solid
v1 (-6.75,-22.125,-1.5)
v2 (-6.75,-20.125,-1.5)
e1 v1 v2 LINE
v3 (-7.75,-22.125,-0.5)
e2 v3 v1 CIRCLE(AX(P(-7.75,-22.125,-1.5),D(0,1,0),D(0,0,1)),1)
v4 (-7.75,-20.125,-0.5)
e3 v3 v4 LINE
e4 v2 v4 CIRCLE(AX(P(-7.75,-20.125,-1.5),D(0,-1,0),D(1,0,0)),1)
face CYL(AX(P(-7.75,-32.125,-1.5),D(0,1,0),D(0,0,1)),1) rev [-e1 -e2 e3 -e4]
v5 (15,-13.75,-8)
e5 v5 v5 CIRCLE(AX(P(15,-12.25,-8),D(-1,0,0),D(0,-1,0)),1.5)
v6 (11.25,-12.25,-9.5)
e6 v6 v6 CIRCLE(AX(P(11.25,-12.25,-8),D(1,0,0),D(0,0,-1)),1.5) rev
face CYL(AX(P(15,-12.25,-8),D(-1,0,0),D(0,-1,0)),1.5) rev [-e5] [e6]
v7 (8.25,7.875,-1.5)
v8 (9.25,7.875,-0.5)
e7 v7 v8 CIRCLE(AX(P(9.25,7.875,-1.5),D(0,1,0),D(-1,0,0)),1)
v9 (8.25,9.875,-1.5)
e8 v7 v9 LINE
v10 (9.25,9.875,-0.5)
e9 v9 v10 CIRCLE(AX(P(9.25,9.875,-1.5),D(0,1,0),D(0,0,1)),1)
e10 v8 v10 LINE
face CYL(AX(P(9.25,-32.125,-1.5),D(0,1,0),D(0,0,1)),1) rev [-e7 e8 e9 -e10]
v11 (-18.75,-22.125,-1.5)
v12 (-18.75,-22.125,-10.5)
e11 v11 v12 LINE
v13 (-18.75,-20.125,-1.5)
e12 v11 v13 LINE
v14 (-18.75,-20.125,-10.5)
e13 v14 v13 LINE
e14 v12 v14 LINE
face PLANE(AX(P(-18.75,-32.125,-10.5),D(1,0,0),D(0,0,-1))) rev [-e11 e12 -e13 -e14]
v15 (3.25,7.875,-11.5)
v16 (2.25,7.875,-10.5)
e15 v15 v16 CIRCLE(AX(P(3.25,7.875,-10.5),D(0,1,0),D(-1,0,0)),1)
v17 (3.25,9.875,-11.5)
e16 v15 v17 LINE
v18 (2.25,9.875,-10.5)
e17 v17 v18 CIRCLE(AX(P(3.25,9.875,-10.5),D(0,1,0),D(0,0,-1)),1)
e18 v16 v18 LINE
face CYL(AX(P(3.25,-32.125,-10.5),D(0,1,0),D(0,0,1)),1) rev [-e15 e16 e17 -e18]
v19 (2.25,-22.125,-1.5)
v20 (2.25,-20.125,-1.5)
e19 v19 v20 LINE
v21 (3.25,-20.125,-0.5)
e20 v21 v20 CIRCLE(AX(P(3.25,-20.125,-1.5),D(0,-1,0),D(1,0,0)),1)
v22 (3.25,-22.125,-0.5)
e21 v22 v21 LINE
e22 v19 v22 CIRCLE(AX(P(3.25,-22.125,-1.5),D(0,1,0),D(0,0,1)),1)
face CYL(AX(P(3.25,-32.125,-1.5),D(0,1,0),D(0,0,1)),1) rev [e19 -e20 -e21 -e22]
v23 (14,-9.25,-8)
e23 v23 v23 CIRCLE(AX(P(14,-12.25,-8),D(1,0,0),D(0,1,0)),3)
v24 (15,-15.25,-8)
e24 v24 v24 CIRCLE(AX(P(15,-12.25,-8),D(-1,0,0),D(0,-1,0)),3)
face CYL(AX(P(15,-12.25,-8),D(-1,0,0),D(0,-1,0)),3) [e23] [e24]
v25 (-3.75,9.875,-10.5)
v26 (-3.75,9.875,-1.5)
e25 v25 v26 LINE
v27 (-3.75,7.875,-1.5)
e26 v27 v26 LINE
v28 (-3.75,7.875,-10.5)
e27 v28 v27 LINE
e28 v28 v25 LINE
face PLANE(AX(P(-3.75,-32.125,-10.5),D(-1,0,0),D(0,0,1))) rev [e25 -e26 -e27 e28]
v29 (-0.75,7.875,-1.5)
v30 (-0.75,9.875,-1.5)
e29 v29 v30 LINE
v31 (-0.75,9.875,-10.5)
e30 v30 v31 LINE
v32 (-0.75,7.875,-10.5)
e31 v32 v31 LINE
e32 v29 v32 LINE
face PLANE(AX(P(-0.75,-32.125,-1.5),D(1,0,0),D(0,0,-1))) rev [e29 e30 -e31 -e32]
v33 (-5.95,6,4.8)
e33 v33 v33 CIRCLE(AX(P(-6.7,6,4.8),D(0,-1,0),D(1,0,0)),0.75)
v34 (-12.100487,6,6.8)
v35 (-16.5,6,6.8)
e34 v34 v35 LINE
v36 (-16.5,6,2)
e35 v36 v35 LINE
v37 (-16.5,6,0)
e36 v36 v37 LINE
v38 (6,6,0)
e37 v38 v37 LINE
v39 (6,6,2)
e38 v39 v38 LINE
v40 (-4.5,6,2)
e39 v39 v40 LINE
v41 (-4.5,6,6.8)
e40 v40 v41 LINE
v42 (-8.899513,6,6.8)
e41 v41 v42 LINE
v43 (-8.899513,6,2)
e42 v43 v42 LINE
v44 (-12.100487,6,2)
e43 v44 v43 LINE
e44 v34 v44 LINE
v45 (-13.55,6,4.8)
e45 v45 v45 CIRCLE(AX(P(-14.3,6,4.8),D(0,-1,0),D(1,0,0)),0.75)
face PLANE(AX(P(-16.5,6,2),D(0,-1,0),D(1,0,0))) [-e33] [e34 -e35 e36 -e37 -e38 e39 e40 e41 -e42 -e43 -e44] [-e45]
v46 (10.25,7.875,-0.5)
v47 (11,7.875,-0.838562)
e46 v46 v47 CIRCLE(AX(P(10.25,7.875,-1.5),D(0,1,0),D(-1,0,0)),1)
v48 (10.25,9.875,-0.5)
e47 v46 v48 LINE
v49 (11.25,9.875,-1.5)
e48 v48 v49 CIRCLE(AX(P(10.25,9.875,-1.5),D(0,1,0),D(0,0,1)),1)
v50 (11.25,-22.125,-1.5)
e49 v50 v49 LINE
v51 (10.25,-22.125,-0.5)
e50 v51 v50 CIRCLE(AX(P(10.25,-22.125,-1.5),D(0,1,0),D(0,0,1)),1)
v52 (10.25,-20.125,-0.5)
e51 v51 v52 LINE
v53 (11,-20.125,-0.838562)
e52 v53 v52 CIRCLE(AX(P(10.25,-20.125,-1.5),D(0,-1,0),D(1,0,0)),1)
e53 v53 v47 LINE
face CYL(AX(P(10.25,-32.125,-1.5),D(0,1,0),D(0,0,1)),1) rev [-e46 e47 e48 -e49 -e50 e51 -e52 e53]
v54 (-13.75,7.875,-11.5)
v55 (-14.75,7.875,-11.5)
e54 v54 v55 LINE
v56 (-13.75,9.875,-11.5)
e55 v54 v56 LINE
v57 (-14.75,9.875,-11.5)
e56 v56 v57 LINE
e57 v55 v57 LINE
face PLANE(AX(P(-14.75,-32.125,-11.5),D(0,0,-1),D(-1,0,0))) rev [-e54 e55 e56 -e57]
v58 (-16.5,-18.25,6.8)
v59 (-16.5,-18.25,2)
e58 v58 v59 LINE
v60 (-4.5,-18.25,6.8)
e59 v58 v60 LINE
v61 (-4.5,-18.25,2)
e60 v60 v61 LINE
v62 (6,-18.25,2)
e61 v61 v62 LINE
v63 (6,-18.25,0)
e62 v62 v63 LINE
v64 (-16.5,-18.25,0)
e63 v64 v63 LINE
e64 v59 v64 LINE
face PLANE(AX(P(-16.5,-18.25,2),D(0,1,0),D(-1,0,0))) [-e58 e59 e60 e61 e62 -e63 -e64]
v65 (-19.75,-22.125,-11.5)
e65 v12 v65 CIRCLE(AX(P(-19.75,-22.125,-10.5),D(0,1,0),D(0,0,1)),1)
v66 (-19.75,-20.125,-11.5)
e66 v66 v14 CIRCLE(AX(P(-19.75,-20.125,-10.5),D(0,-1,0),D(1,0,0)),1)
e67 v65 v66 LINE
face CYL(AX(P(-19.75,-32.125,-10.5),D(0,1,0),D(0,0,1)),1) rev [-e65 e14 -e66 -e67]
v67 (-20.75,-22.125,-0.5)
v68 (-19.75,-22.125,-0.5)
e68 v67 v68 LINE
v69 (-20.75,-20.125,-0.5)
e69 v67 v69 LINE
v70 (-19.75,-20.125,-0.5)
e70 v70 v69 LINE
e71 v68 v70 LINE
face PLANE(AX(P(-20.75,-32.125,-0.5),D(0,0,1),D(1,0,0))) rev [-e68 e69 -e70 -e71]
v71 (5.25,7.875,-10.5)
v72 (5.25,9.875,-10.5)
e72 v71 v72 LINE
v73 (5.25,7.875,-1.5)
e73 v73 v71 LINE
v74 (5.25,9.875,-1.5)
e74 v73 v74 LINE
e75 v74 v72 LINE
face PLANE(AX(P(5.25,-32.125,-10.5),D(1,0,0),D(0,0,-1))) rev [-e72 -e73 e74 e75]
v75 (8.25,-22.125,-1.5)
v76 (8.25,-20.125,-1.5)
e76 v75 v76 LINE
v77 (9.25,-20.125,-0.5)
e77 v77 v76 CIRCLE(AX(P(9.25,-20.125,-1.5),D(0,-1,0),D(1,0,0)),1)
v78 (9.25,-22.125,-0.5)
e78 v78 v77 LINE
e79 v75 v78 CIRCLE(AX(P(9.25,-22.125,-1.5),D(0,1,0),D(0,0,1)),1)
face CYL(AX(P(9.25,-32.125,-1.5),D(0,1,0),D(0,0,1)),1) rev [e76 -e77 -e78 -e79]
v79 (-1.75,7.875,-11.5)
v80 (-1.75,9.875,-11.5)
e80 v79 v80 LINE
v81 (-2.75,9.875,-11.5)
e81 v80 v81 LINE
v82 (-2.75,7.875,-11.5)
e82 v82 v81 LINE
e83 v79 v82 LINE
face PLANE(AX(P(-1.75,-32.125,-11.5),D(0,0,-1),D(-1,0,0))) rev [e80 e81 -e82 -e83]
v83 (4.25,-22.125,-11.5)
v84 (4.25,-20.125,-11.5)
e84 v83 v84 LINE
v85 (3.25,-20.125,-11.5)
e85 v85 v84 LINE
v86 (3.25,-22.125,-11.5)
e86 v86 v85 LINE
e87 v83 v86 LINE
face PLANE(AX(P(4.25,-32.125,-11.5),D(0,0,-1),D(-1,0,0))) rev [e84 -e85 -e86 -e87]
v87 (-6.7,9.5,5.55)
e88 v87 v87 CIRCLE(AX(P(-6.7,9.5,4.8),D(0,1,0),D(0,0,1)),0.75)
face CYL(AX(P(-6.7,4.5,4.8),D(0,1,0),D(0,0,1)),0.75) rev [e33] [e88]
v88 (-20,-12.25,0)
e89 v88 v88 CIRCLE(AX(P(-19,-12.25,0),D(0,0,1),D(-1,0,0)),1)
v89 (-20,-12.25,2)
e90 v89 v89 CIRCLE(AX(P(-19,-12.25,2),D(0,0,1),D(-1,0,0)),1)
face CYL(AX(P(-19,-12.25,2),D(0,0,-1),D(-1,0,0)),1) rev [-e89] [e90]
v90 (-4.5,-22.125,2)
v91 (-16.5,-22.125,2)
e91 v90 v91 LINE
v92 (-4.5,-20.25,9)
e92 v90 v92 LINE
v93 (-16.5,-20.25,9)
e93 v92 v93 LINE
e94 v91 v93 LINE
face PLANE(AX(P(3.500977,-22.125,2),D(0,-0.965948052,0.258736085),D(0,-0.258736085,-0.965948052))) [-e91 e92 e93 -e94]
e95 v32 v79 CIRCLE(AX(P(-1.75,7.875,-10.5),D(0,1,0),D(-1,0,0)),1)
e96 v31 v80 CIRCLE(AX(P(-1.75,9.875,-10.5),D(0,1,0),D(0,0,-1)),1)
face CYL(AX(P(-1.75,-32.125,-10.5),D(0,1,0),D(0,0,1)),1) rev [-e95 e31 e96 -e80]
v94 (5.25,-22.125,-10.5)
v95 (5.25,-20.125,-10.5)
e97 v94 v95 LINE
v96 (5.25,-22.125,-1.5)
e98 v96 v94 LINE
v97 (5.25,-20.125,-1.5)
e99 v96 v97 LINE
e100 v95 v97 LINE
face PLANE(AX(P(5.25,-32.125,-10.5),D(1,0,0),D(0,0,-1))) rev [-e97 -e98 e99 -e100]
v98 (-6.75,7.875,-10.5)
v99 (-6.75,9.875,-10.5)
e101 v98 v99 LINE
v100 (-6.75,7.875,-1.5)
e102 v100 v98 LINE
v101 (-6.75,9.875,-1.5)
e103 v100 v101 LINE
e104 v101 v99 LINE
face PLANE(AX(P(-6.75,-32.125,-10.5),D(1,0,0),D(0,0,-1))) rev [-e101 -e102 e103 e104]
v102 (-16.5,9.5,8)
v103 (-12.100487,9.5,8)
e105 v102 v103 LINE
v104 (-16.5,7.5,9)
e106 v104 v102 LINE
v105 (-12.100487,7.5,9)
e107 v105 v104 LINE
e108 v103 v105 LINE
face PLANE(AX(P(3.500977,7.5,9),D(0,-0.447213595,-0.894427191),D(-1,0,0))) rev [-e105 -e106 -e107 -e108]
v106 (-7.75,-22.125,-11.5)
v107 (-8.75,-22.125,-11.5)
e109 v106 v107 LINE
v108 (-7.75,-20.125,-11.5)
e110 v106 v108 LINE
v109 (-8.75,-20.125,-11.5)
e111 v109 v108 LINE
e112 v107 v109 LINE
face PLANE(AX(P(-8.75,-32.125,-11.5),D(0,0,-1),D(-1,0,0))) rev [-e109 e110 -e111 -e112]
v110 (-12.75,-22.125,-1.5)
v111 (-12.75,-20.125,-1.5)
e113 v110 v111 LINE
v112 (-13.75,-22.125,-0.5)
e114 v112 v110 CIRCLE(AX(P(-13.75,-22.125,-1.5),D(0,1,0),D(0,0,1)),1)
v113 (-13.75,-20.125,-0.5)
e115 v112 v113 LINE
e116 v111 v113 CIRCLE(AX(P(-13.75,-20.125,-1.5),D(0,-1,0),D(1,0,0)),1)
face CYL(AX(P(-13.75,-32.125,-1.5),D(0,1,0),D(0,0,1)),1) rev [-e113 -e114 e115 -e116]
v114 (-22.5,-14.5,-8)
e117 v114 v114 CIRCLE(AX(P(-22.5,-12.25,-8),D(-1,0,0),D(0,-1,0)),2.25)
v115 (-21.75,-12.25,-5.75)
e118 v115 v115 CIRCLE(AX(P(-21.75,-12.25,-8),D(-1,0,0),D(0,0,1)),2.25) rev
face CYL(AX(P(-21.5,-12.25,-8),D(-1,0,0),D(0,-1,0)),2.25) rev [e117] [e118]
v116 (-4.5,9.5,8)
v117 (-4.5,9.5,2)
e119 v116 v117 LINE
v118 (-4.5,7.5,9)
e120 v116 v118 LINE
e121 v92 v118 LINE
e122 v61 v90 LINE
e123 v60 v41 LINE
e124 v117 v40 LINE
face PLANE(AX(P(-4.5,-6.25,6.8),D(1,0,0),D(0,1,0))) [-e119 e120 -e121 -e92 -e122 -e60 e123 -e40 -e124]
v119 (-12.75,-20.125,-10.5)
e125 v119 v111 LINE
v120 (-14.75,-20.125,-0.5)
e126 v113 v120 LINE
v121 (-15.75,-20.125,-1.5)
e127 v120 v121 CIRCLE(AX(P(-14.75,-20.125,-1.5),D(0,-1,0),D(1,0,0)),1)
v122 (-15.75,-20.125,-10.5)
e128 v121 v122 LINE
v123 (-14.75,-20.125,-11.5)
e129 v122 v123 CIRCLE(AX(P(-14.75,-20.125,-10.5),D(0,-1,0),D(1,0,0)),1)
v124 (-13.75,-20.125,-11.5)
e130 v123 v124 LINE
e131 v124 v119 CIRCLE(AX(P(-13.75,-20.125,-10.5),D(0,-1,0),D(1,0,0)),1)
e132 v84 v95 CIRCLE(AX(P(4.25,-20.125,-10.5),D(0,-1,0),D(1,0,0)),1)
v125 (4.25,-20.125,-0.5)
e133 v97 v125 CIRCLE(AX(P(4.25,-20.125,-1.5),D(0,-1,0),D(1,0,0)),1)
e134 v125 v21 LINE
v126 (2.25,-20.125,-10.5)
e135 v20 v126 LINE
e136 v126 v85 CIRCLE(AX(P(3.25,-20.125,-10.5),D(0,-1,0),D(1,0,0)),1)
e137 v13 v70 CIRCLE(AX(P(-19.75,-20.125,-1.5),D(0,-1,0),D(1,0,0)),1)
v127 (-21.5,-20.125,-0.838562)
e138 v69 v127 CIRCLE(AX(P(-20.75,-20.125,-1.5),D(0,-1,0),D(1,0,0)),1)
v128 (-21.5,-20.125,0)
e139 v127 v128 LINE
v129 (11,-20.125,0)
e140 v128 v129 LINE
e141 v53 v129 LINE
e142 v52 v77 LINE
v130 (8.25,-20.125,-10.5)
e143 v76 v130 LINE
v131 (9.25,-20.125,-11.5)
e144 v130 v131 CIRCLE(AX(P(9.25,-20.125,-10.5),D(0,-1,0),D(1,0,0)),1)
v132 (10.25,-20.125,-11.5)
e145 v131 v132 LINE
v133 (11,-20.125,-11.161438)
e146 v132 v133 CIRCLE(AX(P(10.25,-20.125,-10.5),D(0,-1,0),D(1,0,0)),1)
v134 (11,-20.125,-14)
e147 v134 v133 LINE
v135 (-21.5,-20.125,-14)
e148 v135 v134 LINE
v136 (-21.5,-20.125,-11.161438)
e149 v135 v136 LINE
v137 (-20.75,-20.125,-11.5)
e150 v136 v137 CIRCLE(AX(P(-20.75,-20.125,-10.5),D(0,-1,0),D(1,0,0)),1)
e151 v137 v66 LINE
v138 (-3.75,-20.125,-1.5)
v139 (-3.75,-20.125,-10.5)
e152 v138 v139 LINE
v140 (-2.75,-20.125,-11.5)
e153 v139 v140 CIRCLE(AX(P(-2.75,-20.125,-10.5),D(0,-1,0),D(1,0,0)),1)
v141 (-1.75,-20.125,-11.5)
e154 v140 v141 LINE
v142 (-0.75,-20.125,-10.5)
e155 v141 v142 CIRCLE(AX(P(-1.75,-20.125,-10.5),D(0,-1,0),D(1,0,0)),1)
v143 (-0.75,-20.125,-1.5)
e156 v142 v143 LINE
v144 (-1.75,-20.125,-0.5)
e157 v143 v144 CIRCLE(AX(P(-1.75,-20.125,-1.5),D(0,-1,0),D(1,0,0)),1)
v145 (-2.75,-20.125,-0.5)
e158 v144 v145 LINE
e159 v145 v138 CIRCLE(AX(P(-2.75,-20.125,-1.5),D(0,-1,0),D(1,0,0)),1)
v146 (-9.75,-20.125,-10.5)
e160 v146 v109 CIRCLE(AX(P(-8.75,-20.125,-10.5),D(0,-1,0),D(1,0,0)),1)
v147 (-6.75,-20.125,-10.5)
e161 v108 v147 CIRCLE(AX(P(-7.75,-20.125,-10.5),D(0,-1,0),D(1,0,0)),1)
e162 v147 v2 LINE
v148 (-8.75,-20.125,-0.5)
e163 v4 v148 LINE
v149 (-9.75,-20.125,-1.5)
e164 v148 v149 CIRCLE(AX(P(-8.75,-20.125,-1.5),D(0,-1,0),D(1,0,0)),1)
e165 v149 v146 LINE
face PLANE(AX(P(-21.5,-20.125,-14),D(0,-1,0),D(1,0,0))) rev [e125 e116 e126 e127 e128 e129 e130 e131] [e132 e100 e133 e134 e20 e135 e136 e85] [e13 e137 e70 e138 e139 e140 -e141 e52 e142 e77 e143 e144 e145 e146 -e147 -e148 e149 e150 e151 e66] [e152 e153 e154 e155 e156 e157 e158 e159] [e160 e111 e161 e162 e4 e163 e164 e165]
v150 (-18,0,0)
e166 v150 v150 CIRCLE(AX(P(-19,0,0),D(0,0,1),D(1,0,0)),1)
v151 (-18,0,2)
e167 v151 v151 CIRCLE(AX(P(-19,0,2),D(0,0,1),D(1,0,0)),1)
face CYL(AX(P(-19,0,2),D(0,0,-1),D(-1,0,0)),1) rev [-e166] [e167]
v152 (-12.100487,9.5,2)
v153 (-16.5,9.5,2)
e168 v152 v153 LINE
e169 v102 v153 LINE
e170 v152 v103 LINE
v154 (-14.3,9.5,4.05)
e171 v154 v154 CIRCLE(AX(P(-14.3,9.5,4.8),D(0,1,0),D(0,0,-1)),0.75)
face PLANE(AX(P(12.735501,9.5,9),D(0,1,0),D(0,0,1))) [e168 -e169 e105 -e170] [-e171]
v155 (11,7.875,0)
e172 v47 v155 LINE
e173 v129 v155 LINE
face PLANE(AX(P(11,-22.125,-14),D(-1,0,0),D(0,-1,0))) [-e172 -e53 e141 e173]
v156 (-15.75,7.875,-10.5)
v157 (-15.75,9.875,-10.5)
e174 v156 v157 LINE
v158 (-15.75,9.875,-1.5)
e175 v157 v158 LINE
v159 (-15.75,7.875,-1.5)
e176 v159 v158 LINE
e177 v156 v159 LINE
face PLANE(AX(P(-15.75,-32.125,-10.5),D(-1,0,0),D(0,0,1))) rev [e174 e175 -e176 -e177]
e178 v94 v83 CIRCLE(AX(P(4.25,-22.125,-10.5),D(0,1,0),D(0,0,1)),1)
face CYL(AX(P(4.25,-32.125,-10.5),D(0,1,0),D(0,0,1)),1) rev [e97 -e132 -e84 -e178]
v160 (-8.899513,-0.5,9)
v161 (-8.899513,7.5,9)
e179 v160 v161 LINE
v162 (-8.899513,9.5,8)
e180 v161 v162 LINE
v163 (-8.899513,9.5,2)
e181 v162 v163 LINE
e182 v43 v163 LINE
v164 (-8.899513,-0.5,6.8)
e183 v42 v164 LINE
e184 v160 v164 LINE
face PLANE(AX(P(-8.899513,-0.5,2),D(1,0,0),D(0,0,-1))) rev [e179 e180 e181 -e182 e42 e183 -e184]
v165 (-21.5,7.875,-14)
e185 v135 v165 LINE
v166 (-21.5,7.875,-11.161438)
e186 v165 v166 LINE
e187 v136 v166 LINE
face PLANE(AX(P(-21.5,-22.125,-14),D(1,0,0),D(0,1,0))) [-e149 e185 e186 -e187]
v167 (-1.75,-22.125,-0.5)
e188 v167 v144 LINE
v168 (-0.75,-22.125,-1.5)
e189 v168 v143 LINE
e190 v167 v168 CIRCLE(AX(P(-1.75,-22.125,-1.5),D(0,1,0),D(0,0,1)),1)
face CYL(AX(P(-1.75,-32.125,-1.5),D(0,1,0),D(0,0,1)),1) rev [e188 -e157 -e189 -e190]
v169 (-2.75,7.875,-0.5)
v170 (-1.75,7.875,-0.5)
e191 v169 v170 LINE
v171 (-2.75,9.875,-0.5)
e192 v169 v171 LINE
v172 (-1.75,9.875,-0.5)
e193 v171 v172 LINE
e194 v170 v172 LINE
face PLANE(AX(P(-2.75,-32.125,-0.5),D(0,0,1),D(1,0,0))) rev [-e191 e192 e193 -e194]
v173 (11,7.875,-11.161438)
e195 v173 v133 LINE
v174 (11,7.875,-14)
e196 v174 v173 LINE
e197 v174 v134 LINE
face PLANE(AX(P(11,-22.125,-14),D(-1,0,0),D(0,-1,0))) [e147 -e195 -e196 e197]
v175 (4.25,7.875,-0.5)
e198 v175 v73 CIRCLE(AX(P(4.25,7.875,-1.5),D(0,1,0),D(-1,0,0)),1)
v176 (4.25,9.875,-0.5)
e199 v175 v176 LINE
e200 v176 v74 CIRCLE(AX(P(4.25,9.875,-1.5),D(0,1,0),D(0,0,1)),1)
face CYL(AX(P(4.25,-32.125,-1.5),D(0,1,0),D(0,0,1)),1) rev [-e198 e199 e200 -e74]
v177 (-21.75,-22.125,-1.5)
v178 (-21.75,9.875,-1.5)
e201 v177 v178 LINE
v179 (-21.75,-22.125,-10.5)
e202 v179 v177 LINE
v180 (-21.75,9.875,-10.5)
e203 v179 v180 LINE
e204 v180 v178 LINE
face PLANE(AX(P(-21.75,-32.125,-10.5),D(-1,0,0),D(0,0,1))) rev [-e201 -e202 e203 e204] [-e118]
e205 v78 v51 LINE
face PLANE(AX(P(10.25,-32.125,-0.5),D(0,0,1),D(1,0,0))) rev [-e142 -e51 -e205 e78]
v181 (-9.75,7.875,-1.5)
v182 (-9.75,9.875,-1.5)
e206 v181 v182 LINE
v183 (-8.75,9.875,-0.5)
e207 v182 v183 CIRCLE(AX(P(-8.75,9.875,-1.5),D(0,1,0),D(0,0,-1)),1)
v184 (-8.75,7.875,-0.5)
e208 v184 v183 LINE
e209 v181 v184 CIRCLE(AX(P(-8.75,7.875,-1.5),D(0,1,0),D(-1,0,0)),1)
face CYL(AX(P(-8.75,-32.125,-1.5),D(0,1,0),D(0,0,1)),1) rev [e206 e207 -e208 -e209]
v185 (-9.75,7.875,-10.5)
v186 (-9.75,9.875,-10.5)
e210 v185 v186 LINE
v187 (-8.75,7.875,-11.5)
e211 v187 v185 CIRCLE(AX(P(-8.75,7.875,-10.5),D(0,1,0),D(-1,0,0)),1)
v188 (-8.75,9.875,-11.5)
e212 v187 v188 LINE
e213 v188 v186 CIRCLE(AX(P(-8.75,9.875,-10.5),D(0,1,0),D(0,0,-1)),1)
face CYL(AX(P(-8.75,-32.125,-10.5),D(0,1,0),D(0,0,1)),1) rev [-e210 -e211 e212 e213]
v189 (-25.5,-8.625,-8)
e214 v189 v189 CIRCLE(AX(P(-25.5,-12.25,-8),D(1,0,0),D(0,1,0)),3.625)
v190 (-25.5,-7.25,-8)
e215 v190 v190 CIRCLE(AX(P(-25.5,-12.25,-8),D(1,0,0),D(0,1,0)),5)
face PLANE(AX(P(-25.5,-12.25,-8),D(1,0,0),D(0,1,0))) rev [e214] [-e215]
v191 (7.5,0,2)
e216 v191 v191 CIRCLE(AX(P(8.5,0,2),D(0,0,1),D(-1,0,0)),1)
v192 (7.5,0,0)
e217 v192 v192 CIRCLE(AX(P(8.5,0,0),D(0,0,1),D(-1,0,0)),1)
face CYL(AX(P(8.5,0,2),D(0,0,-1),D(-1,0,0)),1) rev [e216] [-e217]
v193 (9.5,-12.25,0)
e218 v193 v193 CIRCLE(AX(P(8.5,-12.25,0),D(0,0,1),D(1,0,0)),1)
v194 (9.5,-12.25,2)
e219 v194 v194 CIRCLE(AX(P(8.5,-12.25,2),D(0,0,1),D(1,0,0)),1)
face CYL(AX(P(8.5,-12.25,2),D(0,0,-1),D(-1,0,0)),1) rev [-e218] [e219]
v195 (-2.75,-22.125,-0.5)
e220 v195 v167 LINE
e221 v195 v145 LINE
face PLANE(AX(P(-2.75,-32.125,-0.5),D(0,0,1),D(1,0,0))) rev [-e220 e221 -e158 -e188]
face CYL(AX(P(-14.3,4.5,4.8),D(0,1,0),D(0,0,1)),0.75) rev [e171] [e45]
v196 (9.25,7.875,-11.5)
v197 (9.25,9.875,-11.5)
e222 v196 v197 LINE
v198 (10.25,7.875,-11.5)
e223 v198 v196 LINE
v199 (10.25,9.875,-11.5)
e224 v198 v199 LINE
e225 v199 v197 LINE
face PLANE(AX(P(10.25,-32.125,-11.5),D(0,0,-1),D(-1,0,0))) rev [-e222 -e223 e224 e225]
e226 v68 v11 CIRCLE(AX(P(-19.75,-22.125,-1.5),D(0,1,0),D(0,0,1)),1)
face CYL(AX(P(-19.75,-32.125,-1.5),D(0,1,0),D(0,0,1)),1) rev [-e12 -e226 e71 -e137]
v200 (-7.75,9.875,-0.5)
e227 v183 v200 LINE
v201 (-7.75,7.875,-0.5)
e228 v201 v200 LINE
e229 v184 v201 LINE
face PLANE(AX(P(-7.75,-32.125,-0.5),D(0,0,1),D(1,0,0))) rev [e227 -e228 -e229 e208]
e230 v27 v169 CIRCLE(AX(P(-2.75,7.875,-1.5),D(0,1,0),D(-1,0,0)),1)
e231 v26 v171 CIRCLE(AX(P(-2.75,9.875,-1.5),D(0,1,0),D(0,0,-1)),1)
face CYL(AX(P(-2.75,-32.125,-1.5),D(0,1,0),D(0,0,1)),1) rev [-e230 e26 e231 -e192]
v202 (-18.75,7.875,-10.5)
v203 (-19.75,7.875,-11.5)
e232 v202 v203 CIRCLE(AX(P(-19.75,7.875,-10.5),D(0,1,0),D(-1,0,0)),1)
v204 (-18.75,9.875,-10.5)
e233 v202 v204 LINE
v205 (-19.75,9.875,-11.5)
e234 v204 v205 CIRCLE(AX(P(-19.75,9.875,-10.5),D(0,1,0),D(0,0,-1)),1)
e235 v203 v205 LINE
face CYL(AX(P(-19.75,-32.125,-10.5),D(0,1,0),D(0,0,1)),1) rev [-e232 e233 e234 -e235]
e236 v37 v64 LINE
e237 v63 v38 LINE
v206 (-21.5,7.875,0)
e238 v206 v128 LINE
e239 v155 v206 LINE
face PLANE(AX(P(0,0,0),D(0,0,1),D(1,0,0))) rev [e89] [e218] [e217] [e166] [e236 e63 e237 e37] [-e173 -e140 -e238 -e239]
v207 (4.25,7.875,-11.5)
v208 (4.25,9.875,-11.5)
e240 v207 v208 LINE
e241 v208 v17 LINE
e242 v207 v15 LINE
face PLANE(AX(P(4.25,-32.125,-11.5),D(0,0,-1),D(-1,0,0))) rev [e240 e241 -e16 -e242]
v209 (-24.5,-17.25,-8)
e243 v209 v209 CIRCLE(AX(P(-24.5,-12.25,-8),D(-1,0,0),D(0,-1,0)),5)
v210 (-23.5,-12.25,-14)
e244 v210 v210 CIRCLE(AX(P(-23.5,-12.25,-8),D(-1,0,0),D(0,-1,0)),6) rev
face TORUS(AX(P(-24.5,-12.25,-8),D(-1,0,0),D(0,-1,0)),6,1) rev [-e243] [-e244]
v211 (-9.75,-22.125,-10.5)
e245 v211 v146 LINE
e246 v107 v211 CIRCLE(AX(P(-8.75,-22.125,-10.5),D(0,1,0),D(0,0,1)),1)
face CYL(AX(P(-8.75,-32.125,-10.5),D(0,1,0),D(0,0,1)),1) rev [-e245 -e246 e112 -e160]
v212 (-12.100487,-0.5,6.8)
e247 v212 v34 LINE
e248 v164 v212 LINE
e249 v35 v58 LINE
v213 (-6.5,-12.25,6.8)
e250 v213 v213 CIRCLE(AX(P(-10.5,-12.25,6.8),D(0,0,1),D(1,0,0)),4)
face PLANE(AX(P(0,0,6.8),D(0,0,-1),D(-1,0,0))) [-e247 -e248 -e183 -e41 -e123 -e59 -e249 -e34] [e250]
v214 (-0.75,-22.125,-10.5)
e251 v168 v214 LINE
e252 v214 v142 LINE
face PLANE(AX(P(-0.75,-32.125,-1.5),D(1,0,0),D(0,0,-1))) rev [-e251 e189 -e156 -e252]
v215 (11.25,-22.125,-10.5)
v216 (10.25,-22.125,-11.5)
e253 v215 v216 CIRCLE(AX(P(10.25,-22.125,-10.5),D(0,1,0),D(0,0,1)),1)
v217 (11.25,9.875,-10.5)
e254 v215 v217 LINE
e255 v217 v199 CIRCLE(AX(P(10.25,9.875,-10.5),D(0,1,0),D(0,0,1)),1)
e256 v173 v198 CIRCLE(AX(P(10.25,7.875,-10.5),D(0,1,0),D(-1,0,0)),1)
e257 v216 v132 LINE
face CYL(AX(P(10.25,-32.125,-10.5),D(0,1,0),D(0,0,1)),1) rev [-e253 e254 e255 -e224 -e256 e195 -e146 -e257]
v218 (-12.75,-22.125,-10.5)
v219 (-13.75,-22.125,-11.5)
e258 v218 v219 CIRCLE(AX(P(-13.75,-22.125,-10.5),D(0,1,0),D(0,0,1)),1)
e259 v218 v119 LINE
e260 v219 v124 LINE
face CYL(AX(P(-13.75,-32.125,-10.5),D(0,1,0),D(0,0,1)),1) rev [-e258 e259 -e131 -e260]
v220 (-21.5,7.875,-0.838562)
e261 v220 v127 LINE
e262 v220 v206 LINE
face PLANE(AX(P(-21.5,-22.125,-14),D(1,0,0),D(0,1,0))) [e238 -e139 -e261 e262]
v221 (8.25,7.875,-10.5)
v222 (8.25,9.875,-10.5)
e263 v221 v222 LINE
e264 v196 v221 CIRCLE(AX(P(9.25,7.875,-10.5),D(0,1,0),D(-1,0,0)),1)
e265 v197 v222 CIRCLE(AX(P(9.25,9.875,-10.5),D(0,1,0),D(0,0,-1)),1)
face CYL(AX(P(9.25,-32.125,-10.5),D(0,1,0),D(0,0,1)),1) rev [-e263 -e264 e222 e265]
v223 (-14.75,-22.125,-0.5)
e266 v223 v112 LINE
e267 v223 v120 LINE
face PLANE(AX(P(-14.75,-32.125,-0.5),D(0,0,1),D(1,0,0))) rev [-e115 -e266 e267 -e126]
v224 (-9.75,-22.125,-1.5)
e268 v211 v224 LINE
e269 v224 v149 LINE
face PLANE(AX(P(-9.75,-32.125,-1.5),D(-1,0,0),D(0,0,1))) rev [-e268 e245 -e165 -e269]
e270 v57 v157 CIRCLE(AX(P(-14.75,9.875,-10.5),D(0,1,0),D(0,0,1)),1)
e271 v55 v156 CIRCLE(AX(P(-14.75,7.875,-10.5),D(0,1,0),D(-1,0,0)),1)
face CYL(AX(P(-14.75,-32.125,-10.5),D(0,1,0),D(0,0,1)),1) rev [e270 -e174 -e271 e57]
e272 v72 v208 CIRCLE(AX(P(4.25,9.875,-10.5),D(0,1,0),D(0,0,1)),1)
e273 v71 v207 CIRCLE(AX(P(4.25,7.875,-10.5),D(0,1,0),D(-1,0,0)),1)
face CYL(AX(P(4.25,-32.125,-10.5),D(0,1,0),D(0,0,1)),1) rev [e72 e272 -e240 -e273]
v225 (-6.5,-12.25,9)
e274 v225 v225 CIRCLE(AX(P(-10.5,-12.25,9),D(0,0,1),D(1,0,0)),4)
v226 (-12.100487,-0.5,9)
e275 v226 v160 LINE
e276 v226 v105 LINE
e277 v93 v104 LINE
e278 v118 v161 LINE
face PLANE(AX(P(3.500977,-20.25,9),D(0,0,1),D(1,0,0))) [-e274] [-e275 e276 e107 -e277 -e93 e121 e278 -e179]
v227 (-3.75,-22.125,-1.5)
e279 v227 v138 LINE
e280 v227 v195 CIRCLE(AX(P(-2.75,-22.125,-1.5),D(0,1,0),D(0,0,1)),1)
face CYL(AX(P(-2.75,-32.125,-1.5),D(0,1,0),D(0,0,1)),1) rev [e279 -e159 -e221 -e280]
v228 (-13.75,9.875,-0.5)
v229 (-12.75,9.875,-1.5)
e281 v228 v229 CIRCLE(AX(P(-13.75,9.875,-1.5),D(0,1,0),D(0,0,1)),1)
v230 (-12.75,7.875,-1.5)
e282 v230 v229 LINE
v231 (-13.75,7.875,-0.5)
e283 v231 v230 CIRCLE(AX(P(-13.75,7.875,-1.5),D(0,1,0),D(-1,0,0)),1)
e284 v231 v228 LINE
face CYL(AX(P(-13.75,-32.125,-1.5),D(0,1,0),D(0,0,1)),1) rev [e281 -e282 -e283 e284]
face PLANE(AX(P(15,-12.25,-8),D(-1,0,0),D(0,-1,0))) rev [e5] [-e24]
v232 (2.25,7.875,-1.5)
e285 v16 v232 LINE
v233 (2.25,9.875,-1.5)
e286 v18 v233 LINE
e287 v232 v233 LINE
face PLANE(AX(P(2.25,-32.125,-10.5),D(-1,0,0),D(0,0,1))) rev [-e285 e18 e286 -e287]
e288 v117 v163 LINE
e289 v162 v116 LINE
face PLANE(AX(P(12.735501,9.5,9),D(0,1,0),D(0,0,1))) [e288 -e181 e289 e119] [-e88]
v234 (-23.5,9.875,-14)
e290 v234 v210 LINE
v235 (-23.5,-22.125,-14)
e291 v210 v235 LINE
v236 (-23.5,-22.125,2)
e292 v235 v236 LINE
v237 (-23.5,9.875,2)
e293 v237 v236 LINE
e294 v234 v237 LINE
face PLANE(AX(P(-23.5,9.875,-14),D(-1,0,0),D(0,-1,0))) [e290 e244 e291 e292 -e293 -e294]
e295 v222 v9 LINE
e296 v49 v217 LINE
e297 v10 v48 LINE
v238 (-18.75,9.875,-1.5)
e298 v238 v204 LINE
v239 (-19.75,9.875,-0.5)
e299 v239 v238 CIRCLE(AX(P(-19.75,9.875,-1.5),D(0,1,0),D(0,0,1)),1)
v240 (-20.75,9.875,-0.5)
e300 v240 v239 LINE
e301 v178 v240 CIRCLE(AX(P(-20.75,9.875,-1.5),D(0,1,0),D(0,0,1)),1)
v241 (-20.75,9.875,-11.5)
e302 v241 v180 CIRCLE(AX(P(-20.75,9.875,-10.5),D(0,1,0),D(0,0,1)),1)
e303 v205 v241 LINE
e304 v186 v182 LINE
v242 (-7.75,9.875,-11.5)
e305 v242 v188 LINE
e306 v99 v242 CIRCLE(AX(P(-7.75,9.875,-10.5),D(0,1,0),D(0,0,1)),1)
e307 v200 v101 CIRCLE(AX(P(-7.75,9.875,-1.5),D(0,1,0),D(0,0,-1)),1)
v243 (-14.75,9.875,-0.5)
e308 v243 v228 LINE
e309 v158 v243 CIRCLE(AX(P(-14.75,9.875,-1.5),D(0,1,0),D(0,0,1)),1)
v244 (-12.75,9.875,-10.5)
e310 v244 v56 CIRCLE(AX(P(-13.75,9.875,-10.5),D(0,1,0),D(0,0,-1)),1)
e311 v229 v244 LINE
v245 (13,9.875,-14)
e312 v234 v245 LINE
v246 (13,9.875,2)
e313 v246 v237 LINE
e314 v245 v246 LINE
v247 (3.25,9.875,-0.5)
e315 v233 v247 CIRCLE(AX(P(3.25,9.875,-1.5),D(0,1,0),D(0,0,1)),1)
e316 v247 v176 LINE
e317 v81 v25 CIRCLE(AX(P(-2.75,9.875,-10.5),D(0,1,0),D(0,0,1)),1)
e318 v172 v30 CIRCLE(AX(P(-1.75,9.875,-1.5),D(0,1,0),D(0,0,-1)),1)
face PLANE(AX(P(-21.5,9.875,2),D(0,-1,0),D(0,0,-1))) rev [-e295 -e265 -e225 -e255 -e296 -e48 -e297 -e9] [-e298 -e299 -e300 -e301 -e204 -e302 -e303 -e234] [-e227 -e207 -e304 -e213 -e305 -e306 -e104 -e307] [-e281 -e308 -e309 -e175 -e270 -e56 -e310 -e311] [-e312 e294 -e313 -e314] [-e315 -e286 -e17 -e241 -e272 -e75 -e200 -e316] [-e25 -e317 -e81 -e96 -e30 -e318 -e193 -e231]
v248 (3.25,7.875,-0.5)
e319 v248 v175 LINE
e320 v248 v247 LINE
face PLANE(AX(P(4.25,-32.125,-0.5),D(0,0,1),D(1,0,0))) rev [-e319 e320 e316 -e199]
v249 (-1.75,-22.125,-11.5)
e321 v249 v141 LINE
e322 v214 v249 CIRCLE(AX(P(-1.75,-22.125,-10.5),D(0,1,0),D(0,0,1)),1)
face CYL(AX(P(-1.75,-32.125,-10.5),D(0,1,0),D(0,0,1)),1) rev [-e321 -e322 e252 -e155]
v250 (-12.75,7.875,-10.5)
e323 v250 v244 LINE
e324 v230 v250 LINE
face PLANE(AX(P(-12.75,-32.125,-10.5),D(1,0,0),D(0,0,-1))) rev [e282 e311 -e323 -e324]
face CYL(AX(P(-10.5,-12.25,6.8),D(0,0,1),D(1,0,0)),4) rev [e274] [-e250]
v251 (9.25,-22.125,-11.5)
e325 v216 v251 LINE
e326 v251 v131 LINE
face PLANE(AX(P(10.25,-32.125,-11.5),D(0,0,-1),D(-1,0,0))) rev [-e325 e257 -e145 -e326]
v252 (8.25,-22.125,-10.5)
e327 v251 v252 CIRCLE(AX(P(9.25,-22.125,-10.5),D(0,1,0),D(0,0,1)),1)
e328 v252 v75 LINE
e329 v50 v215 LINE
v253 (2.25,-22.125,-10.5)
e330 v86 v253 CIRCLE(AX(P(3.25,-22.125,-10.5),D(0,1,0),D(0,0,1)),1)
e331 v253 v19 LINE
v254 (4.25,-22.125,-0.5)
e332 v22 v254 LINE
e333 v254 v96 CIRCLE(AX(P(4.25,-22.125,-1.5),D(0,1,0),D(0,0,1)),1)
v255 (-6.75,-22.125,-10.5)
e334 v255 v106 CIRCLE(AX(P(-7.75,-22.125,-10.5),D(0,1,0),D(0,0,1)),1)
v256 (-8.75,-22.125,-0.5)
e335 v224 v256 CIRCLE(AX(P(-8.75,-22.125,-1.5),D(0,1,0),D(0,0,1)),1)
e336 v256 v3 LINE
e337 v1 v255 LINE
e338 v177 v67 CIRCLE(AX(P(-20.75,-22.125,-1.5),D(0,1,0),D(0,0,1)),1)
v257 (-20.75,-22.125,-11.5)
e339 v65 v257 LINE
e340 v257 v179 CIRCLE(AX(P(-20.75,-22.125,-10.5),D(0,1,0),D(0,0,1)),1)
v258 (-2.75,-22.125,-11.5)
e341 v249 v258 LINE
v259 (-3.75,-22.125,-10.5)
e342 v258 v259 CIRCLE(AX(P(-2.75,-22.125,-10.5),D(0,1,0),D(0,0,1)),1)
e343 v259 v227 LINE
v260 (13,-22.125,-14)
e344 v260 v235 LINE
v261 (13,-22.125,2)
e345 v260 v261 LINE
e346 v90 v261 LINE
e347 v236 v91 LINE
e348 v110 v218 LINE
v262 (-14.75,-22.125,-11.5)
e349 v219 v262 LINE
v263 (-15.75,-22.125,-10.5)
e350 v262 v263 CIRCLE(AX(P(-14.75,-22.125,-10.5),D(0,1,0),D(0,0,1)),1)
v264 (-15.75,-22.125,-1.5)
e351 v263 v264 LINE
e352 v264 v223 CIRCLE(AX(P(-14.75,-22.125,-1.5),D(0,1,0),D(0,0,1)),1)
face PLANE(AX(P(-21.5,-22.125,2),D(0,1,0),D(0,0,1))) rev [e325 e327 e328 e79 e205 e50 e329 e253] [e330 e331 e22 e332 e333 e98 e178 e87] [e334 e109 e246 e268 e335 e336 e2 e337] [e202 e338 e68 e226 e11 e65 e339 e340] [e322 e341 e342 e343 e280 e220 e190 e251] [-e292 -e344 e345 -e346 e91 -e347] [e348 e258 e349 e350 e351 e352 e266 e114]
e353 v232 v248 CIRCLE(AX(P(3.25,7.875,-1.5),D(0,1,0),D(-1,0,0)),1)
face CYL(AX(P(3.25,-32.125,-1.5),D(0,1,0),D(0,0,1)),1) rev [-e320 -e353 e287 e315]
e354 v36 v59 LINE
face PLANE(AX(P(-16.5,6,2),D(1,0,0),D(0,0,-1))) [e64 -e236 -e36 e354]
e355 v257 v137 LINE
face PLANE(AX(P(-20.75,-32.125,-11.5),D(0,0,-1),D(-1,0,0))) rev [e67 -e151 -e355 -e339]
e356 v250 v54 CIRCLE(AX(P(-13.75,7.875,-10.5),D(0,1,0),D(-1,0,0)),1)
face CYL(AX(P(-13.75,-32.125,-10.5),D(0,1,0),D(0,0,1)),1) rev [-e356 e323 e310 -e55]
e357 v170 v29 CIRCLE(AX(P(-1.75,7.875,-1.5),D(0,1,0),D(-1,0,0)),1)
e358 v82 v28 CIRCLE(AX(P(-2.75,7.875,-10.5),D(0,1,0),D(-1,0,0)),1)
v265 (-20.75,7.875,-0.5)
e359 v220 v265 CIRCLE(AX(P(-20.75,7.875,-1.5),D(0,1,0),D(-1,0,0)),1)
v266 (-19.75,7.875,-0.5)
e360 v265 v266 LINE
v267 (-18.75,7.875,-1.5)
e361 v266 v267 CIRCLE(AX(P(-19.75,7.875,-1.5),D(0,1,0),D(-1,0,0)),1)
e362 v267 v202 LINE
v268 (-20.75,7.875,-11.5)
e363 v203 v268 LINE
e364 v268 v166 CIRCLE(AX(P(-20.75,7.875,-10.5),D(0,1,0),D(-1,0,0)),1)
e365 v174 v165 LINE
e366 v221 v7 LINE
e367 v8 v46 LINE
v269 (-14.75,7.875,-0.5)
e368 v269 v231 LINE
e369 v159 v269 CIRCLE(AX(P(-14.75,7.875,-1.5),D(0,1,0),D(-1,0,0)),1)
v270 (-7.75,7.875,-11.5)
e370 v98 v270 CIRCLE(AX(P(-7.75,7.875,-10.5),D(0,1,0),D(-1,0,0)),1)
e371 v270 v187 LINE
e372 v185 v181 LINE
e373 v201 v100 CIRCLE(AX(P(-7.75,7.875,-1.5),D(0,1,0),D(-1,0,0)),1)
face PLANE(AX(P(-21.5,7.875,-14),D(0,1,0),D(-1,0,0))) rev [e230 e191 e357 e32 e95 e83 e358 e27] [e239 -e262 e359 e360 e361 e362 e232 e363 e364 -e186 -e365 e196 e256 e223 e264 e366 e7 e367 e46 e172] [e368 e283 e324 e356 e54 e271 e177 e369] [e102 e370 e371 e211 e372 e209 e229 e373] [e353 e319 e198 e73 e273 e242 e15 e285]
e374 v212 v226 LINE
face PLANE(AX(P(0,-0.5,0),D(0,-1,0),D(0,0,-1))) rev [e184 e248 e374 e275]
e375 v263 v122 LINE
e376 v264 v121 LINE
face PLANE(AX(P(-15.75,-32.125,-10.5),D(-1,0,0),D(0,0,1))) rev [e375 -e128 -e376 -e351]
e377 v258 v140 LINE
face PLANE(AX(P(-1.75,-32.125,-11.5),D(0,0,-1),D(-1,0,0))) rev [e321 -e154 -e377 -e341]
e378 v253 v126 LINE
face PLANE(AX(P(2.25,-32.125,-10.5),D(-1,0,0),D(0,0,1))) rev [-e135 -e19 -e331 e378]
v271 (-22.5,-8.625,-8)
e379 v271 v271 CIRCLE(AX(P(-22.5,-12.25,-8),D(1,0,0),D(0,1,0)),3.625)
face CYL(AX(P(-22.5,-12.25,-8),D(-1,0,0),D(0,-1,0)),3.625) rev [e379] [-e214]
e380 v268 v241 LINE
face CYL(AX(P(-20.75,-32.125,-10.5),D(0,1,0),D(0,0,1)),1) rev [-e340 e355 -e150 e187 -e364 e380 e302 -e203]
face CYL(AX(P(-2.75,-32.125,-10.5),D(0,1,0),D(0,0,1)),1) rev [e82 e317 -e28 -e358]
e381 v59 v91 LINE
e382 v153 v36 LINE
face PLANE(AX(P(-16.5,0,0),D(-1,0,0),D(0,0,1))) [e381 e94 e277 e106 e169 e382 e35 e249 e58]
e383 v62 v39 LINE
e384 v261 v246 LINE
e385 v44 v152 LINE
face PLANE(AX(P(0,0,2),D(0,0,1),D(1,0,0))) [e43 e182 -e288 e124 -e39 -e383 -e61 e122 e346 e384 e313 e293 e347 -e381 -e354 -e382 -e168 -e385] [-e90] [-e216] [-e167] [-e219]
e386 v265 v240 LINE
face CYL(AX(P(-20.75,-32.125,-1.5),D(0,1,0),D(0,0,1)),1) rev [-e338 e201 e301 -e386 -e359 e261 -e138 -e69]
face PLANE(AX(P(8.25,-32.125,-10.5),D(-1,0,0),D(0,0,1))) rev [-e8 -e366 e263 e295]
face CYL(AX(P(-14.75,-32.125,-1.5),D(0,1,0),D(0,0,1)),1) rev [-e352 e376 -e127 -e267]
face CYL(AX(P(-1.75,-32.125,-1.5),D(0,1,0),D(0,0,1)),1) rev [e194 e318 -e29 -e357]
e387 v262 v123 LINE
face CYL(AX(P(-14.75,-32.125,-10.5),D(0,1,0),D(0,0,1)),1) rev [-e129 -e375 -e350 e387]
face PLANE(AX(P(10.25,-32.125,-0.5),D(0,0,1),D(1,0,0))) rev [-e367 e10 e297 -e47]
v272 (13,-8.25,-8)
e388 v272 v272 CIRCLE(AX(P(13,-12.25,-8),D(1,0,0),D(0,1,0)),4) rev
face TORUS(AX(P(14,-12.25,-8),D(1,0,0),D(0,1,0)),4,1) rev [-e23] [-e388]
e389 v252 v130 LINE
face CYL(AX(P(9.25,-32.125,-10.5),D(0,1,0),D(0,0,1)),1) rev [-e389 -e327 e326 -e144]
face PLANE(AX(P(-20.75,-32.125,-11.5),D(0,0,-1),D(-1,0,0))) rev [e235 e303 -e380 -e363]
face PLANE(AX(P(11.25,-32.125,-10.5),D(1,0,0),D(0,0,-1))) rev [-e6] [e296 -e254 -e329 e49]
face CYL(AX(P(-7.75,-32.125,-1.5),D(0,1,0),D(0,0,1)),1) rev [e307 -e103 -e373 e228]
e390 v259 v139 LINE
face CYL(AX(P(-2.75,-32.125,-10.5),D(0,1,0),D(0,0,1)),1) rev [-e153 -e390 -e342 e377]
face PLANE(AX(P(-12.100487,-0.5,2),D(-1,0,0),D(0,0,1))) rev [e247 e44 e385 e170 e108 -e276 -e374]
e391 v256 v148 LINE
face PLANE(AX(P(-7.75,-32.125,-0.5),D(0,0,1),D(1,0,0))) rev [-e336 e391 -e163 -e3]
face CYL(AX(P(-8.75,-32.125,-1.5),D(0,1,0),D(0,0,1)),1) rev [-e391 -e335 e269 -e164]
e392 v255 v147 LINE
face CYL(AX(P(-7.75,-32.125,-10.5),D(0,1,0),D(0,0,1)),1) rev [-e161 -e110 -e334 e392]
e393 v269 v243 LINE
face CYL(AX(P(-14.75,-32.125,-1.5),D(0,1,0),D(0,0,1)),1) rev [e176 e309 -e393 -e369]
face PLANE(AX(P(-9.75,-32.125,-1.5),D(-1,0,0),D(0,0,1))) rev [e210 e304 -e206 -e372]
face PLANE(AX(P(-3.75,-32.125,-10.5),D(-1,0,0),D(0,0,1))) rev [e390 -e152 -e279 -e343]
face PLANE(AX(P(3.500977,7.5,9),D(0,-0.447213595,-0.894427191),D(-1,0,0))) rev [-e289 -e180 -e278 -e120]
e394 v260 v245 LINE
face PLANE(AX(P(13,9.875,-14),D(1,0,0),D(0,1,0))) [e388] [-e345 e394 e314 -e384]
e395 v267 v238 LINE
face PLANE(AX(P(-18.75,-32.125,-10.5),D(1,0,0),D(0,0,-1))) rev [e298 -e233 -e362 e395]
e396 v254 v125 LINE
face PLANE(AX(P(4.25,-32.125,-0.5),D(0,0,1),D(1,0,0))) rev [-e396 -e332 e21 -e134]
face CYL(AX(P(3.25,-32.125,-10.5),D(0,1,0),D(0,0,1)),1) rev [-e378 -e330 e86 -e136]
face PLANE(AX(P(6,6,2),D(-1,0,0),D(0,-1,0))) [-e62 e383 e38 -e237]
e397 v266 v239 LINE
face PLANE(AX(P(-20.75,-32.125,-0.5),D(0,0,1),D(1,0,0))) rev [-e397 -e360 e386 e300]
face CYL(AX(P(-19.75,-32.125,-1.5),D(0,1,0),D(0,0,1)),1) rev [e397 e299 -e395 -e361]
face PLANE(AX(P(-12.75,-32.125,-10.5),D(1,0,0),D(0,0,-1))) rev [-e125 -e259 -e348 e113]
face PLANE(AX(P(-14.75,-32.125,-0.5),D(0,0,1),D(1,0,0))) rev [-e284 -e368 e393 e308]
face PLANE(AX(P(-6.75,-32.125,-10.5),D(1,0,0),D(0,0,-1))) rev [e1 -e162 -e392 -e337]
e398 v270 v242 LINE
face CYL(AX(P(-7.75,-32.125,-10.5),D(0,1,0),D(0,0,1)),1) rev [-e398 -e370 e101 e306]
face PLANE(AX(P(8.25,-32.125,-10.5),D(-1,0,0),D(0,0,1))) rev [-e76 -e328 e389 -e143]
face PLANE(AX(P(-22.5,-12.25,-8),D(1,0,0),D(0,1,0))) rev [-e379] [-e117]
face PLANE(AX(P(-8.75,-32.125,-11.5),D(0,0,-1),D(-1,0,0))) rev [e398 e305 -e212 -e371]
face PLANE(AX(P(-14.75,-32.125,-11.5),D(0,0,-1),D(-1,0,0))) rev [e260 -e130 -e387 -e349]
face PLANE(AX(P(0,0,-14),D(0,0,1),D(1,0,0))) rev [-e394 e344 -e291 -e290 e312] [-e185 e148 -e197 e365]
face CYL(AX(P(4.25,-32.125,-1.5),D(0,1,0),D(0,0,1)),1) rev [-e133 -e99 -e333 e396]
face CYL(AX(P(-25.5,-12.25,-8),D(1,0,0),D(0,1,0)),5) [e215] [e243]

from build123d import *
from OCP.BRepFilletAPI import BRepFilletAPI_MakeChamfer

# Parameters (mm, degrees)
SKETCH_1_W          = 32.5
SKETCH_1_H          = 32
SKETCH_1_R          = 1
SKETCH_1_W_2        = 22.5
SKETCH_1_H_2        = 24.25
EXTRUDE_1_DEPTH     = 2
SKETCH_2_W          = 12
SKETCH_2_H          = 12
SKETCH_2_R          = 4
EXTRUDE_2_DEPTH     = 2.2
EXTRUDE_3_DEPTH     = 12
EXTRUDE_4_DEPTH     = 12
SKETCH_5_W          = 32.5
SKETCH_5_H          = 2
EXTRUDE_5_DEPTH     = 14
SKETCH_7_W          = 2
SKETCH_7_H          = 32
EXTRUDE_6_DEPTH     = 16
SKETCH_9_R          = 3.625
CUT_EXTRUDE_1_DEPTH = 1
SKETCH_10_R         = 2.25
CUT_EXTRUDE_2_DEPTH = 1
EXTRUDE_START       = -2
SKETCH_11_R         = 5
SKETCH_11_R_2       = 3.625
EXTRUDE_7_DEPTH     = 2
FILLET_1_R          = 1
SKETCH_12_R         = 3
SKETCH_12_R_2       = 1.5
EXTRUDE_8_DEPTH     = 2
FILLET_2_R          = 1
CUT_EXTRUDE_START   = 2
SKETCH_13_R         = 1.5
CUT_EXTRUDE_3_DEPTH = 2
SKETCH_19_W         = 3.200973594
SKETCH_19_H         = 7
CUT_EXTRUDE_7_DEPTH = 10
CUT_EXTRUDE_8_DEPTH = 42
SKETCH_22_R         = 0.75
CUT_EXTRUDE_9_DEPTH = 5
CHAMFER_1_SIZE      = 1
CHAMFER_1_SIZE2     = 2


with BuildPart() as part:
    # 草图1 → 凸台-拉伸1 (new body)
    with BuildSketch(Plane.XY):
        with Locations((-5.25, -6.125)):
            Rectangle(SKETCH_1_W, SKETCH_1_H)
        with Locations((-19, 0)):
            Circle(SKETCH_1_R, mode=Mode.SUBTRACT)
        with Locations(Location((8.5, 0, 0), (0, 0, 180))):
            Circle(SKETCH_1_R, mode=Mode.SUBTRACT)
        with Locations(Location((-19, -12.25, 0), (0, 0, 180))):
            Circle(SKETCH_1_R, mode=Mode.SUBTRACT)
        with Locations((8.5, -12.25)):
            Circle(SKETCH_1_R, mode=Mode.SUBTRACT)
        with Locations((-5.25, -6.125)):
            Rectangle(SKETCH_1_W_2, SKETCH_1_H_2, mode=Mode.SUBTRACT)
    extrude(amount=EXTRUDE_1_DEPTH)



with BuildPart() as body_2:
    # 草图2 → 凸台-拉伸2 (new body)
    with BuildSketch(Plane.XY.offset(9)):
        with Locations((-10.5, -12.25)):
            Rectangle(SKETCH_2_W, SKETCH_2_H)
        with Locations((-10.5, -12.25)):
            Circle(SKETCH_2_R, mode=Mode.SUBTRACT)
    extrude(amount=-EXTRUDE_2_DEPTH)


with BuildPart() as part_1:
    add(part.part)

    add(body_2.part)  # 凸台-拉伸3 merges body 2
    # 草图3 → 凸台-拉伸3 (add)
    with BuildSketch(Plane.ZY.offset(16.5)):
        Polygon((9, -18.25), (2, -18.25), (2, -22.125), (9, -20.25), align=None)
    extrude(amount=-EXTRUDE_3_DEPTH)

    # 草图4 → 凸台-拉伸4 (add)
    with BuildSketch(Plane.ZY.offset(16.5)):
        Polygon((6.8, -6.25), (9, -6.25), (9, 9.5), (2, 9.5), (2, 6), (6.8, 6), align=None)
    extrude(amount=-EXTRUDE_4_DEPTH)

    # 草图5 → 凸台-拉伸5 (add)
    with BuildSketch(Plane(origin=(0, 0, 0), x_dir=(-1, 0, 0), z_dir=(0, 0, -1))):
        with Locations((5.25, 8.875)):
            Rectangle(SKETCH_5_W, SKETCH_5_H)
        with Locations((5.25, -21.125)):
            Rectangle(SKETCH_5_W, SKETCH_5_H)
    extrude(amount=EXTRUDE_5_DEPTH)

    # 草图7 → 凸台-拉伸6 (add)
    with BuildSketch(Plane.XY.offset(2)):
        with Locations((-22.5, -6.125)):
            Rectangle(SKETCH_7_W, SKETCH_7_H)
        with Locations((12, -6.125)):
            Rectangle(SKETCH_7_W, SKETCH_7_H)
    extrude(amount=-EXTRUDE_6_DEPTH)

    # 草图9 → 切除-拉伸1 (cut)
    with BuildSketch(Plane(origin=(-23.5, 0, 0), x_dir=(0, 0, -1), z_dir=(1, 0, 0))):
        with Locations(Location((8, -12.25, 0), (0, 0, 90))):
            Circle(SKETCH_9_R)
    extrude(amount=CUT_EXTRUDE_1_DEPTH, mode=Mode.SUBTRACT)

    # 草图10 → 切除-拉伸2 (cut)
    with BuildSketch(Plane.ZY.offset(22.5)):
        with Locations(Location((-8, -12.25, 0), (0, 0, 270))):
            Circle(SKETCH_10_R)
    extrude(amount=-CUT_EXTRUDE_2_DEPTH, mode=Mode.SUBTRACT)

    # 草图11 → 凸台-拉伸7 (add)
    with BuildSketch(Plane(origin=(-23.5, 0, 0), x_dir=(0, 0, -1), z_dir=(1, 0, 0)).offset(EXTRUDE_START)):
        with Locations(Location((8, -12.25, 0), (0, 0, 90))):
            Circle(SKETCH_11_R)
        with Locations(Location((8, -12.25, 0), (0, 0, 90))):
            Circle(SKETCH_11_R_2, mode=Mode.SUBTRACT)
    extrude(amount=EXTRUDE_7_DEPTH)

    # 圆角1
    fillet_1_edges = [part_1.edges().sort_by_distance(p)[0] for p in [
        (-23.5, -17.25, -8),
    ]]
    fillet(fillet_1_edges, radius=FILLET_1_R - 0.0001)  # a hair under: the kernel refuses the full size

    # 草图12 → 凸台-拉伸8 (add)
    with BuildSketch(Plane.ZY.offset(-13)):
        with Locations(Location((-8, -12.25, 0), (0, 0, 270))):
            Circle(SKETCH_12_R)
        with Locations(Location((-8, -12.25, 0), (0, 0, 270))):
            Circle(SKETCH_12_R_2, mode=Mode.SUBTRACT)
    extrude(amount=-EXTRUDE_8_DEPTH)

    # 圆角2
    fillet_2_edges = [part_1.edges().sort_by_distance(p)[0] for p in [
        (13, -9.25, -8),
    ]]
    fillet(fillet_2_edges, radius=FILLET_2_R)

    # 草图13 → 切除-拉伸3 (cut)
    with BuildSketch(Plane.ZY.offset(-13).offset(CUT_EXTRUDE_START)):
        with Locations(Location((-8, -12.25, 0), (0, 0, 270))):
            Circle(SKETCH_13_R)
    extrude(amount=-CUT_EXTRUDE_3_DEPTH, mode=Mode.SUBTRACT)

    # 草图19 → 切除-拉伸7 (cut)
    with BuildSketch(Plane(origin=(0, 9.5, 0), x_dir=(1, 0, 0), z_dir=(0, 1, 0))):
        with Locations((-10.5, -5.5)):
            Rectangle(SKETCH_19_W, SKETCH_19_H)
    extrude(amount=-CUT_EXTRUDE_7_DEPTH, mode=Mode.SUBTRACT)

    # 草图20 → 切除-拉伸8 (cut)
    with BuildSketch(Plane(origin=(0, 9.875, 0), x_dir=(1, 0, 0), z_dir=(0, 1, 0))):
        with BuildLine():
            Line((-6.75, 10.5), (-6.75, 1.5))
            ThreePointArc((-6.75, 1.5), (-7.042893219, 0.792893219), (-7.75, 0.5))
            Line((-7.75, 0.5), (-8.75, 0.5))
            ThreePointArc((-8.75, 0.5), (-9.457106781, 0.792893219), (-9.75, 1.5))
            Line((-9.75, 1.5), (-9.75, 10.5))
            ThreePointArc((-9.75, 10.5), (-9.457106781, 11.207106781), (-8.75, 11.5))
            Line((-8.75, 11.5), (-7.75, 11.5))
            ThreePointArc((-7.75, 11.5), (-7.042893219, 11.207106781), (-6.75, 10.5))
        make_face()
        with BuildLine():
            Line((8.25, 10.5), (8.25, 1.5))
            ThreePointArc((8.25, 1.5), (8.542893219, 0.792893219), (9.25, 0.5))
            Line((9.25, 0.5), (10.25, 0.5))
            ThreePointArc((10.25, 0.5), (10.957106781, 0.792893219), (11.25, 1.5))
            Line((11.25, 1.5), (11.25, 10.5))
            ThreePointArc((11.25, 10.5), (10.957106781, 11.207106781), (10.25, 11.5))
            Line((10.25, 11.5), (9.25, 11.5))
            ThreePointArc((9.25, 11.5), (8.542893219, 11.207106781), (8.25, 10.5))
        make_face()
        with BuildLine():
            Line((-14.75, 11.5), (-13.75, 11.5))
            ThreePointArc((-13.75, 11.5), (-13.042893219, 11.207106781), (-12.75, 10.5))
            Line((-12.75, 10.5), (-12.75, 1.5))
            ThreePointArc((-12.75, 1.5), (-13.042893219, 0.792893219), (-13.75, 0.5))
            Line((-13.75, 0.5), (-14.75, 0.5))
            ThreePointArc((-14.75, 0.5), (-15.457106781, 0.792893219), (-15.75, 1.5))
            Line((-15.75, 1.5), (-15.75, 10.5))
            ThreePointArc((-15.75, 10.5), (-15.457106781, 11.207106781), (-14.75, 11.5))
        make_face()
        with BuildLine():
            Line((-20.75, 11.5), (-19.75, 11.5))
            ThreePointArc((-19.75, 11.5), (-19.042893219, 11.207106781), (-18.75, 10.5))
            Line((-18.75, 10.5), (-18.75, 1.5))
            ThreePointArc((-18.75, 1.5), (-19.042893219, 0.792893219), (-19.75, 0.5))
            Line((-19.75, 0.5), (-20.75, 0.5))
            ThreePointArc((-20.75, 0.5), (-21.457106781, 0.792893219), (-21.75, 1.5))
            Line((-21.75, 1.5), (-21.75, 10.5))
            ThreePointArc((-21.75, 10.5), (-21.457106781, 11.207106781), (-20.75, 11.5))
        make_face()
        with BuildLine():
            Line((2.25, 10.5), (2.25, 1.5))
            ThreePointArc((2.25, 1.5), (2.542893219, 0.792893219), (3.25, 0.5))
            Line((3.25, 0.5), (4.25, 0.5))
            ThreePointArc((4.25, 0.5), (4.957106781, 0.792893219), (5.25, 1.5))
            Line((5.25, 1.5), (5.25, 10.5))
            ThreePointArc((5.25, 10.5), (4.957106781, 11.207106781), (4.25, 11.5))
            Line((4.25, 11.5), (3.25, 11.5))
            ThreePointArc((3.25, 11.5), (2.542893219, 11.207106781), (2.25, 10.5))
        make_face()
        with BuildLine():
            Line((-1.75, 11.5), (-2.75, 11.5))
            ThreePointArc((-2.75, 11.5), (-3.457106781, 11.207106781), (-3.75, 10.5))
            Line((-3.75, 10.5), (-3.75, 1.5))
            ThreePointArc((-3.75, 1.5), (-3.457106781, 0.792893219), (-2.75, 0.5))
            Line((-2.75, 0.5), (-1.75, 0.5))
            ThreePointArc((-1.75, 0.5), (-1.042893219, 0.792893219), (-0.75, 1.5))
            Line((-0.75, 1.5), (-0.75, 10.5))
            ThreePointArc((-0.75, 10.5), (-1.042893219, 11.207106781), (-1.75, 11.5))
        make_face()
    extrude(amount=-CUT_EXTRUDE_8_DEPTH, mode=Mode.SUBTRACT)

    # 草图22 → 切除-拉伸9 (cut)
    with BuildSketch(Plane(origin=(0, 9.5, 0), x_dir=(1, 0, 0), z_dir=(0, 1, 0))):
        with Locations(Location((-6.7, -4.8, 0), (0, 0, 270))):
            Circle(SKETCH_22_R)
        with Locations((-14.3, -4.8)):
            Circle(SKETCH_22_R)
    extrude(amount=-CUT_EXTRUDE_9_DEPTH, mode=Mode.SUBTRACT)

    # 倒角1: one chamfer whose edges measure the first distance from different faces: ONE call of the kernel's chamfer builder (chamfer() names one face for all edges)
    chamfer_1_edges_1 = [part_1.edges().sort_by_distance(p)[0] for p in [
        (-14.300243398, 9.5, 9),
    ]]
    chamfer_1_side_1 = [part_1.faces().sort_by_distance(p)[0] for p in [
        (-16.417322484, 9.5, 5.5),
    ]]
    chamfer_1_edges_2 = [part_1.edges().sort_by_distance(p)[0] for p in [
        (-6.699756602, 9.5, 9),
    ]]
    chamfer_1_side_2 = [part_1.faces().sort_by_distance(p)[0] for p in [
        (-8.816835687, 9.5, 5.5),
    ]]
    chamfer_1 = BRepFilletAPI_MakeChamfer(part_1.part.solid().wrapped)
    for e in chamfer_1_edges_1:
        chamfer_1.Add(CHAMFER_1_SIZE, CHAMFER_1_SIZE2, e.wrapped, chamfer_1_side_1[0].wrapped)  # the first distance lies on this face
    for e in chamfer_1_edges_2:
        chamfer_1.Add(CHAMFER_1_SIZE, CHAMFER_1_SIZE2, e.wrapped, chamfer_1_side_2[0].wrapped)  # the first distance lies on this face
    add(Compound.cast(chamfer_1.Shape()), mode=Mode.REPLACE)


solid = part_1.part
